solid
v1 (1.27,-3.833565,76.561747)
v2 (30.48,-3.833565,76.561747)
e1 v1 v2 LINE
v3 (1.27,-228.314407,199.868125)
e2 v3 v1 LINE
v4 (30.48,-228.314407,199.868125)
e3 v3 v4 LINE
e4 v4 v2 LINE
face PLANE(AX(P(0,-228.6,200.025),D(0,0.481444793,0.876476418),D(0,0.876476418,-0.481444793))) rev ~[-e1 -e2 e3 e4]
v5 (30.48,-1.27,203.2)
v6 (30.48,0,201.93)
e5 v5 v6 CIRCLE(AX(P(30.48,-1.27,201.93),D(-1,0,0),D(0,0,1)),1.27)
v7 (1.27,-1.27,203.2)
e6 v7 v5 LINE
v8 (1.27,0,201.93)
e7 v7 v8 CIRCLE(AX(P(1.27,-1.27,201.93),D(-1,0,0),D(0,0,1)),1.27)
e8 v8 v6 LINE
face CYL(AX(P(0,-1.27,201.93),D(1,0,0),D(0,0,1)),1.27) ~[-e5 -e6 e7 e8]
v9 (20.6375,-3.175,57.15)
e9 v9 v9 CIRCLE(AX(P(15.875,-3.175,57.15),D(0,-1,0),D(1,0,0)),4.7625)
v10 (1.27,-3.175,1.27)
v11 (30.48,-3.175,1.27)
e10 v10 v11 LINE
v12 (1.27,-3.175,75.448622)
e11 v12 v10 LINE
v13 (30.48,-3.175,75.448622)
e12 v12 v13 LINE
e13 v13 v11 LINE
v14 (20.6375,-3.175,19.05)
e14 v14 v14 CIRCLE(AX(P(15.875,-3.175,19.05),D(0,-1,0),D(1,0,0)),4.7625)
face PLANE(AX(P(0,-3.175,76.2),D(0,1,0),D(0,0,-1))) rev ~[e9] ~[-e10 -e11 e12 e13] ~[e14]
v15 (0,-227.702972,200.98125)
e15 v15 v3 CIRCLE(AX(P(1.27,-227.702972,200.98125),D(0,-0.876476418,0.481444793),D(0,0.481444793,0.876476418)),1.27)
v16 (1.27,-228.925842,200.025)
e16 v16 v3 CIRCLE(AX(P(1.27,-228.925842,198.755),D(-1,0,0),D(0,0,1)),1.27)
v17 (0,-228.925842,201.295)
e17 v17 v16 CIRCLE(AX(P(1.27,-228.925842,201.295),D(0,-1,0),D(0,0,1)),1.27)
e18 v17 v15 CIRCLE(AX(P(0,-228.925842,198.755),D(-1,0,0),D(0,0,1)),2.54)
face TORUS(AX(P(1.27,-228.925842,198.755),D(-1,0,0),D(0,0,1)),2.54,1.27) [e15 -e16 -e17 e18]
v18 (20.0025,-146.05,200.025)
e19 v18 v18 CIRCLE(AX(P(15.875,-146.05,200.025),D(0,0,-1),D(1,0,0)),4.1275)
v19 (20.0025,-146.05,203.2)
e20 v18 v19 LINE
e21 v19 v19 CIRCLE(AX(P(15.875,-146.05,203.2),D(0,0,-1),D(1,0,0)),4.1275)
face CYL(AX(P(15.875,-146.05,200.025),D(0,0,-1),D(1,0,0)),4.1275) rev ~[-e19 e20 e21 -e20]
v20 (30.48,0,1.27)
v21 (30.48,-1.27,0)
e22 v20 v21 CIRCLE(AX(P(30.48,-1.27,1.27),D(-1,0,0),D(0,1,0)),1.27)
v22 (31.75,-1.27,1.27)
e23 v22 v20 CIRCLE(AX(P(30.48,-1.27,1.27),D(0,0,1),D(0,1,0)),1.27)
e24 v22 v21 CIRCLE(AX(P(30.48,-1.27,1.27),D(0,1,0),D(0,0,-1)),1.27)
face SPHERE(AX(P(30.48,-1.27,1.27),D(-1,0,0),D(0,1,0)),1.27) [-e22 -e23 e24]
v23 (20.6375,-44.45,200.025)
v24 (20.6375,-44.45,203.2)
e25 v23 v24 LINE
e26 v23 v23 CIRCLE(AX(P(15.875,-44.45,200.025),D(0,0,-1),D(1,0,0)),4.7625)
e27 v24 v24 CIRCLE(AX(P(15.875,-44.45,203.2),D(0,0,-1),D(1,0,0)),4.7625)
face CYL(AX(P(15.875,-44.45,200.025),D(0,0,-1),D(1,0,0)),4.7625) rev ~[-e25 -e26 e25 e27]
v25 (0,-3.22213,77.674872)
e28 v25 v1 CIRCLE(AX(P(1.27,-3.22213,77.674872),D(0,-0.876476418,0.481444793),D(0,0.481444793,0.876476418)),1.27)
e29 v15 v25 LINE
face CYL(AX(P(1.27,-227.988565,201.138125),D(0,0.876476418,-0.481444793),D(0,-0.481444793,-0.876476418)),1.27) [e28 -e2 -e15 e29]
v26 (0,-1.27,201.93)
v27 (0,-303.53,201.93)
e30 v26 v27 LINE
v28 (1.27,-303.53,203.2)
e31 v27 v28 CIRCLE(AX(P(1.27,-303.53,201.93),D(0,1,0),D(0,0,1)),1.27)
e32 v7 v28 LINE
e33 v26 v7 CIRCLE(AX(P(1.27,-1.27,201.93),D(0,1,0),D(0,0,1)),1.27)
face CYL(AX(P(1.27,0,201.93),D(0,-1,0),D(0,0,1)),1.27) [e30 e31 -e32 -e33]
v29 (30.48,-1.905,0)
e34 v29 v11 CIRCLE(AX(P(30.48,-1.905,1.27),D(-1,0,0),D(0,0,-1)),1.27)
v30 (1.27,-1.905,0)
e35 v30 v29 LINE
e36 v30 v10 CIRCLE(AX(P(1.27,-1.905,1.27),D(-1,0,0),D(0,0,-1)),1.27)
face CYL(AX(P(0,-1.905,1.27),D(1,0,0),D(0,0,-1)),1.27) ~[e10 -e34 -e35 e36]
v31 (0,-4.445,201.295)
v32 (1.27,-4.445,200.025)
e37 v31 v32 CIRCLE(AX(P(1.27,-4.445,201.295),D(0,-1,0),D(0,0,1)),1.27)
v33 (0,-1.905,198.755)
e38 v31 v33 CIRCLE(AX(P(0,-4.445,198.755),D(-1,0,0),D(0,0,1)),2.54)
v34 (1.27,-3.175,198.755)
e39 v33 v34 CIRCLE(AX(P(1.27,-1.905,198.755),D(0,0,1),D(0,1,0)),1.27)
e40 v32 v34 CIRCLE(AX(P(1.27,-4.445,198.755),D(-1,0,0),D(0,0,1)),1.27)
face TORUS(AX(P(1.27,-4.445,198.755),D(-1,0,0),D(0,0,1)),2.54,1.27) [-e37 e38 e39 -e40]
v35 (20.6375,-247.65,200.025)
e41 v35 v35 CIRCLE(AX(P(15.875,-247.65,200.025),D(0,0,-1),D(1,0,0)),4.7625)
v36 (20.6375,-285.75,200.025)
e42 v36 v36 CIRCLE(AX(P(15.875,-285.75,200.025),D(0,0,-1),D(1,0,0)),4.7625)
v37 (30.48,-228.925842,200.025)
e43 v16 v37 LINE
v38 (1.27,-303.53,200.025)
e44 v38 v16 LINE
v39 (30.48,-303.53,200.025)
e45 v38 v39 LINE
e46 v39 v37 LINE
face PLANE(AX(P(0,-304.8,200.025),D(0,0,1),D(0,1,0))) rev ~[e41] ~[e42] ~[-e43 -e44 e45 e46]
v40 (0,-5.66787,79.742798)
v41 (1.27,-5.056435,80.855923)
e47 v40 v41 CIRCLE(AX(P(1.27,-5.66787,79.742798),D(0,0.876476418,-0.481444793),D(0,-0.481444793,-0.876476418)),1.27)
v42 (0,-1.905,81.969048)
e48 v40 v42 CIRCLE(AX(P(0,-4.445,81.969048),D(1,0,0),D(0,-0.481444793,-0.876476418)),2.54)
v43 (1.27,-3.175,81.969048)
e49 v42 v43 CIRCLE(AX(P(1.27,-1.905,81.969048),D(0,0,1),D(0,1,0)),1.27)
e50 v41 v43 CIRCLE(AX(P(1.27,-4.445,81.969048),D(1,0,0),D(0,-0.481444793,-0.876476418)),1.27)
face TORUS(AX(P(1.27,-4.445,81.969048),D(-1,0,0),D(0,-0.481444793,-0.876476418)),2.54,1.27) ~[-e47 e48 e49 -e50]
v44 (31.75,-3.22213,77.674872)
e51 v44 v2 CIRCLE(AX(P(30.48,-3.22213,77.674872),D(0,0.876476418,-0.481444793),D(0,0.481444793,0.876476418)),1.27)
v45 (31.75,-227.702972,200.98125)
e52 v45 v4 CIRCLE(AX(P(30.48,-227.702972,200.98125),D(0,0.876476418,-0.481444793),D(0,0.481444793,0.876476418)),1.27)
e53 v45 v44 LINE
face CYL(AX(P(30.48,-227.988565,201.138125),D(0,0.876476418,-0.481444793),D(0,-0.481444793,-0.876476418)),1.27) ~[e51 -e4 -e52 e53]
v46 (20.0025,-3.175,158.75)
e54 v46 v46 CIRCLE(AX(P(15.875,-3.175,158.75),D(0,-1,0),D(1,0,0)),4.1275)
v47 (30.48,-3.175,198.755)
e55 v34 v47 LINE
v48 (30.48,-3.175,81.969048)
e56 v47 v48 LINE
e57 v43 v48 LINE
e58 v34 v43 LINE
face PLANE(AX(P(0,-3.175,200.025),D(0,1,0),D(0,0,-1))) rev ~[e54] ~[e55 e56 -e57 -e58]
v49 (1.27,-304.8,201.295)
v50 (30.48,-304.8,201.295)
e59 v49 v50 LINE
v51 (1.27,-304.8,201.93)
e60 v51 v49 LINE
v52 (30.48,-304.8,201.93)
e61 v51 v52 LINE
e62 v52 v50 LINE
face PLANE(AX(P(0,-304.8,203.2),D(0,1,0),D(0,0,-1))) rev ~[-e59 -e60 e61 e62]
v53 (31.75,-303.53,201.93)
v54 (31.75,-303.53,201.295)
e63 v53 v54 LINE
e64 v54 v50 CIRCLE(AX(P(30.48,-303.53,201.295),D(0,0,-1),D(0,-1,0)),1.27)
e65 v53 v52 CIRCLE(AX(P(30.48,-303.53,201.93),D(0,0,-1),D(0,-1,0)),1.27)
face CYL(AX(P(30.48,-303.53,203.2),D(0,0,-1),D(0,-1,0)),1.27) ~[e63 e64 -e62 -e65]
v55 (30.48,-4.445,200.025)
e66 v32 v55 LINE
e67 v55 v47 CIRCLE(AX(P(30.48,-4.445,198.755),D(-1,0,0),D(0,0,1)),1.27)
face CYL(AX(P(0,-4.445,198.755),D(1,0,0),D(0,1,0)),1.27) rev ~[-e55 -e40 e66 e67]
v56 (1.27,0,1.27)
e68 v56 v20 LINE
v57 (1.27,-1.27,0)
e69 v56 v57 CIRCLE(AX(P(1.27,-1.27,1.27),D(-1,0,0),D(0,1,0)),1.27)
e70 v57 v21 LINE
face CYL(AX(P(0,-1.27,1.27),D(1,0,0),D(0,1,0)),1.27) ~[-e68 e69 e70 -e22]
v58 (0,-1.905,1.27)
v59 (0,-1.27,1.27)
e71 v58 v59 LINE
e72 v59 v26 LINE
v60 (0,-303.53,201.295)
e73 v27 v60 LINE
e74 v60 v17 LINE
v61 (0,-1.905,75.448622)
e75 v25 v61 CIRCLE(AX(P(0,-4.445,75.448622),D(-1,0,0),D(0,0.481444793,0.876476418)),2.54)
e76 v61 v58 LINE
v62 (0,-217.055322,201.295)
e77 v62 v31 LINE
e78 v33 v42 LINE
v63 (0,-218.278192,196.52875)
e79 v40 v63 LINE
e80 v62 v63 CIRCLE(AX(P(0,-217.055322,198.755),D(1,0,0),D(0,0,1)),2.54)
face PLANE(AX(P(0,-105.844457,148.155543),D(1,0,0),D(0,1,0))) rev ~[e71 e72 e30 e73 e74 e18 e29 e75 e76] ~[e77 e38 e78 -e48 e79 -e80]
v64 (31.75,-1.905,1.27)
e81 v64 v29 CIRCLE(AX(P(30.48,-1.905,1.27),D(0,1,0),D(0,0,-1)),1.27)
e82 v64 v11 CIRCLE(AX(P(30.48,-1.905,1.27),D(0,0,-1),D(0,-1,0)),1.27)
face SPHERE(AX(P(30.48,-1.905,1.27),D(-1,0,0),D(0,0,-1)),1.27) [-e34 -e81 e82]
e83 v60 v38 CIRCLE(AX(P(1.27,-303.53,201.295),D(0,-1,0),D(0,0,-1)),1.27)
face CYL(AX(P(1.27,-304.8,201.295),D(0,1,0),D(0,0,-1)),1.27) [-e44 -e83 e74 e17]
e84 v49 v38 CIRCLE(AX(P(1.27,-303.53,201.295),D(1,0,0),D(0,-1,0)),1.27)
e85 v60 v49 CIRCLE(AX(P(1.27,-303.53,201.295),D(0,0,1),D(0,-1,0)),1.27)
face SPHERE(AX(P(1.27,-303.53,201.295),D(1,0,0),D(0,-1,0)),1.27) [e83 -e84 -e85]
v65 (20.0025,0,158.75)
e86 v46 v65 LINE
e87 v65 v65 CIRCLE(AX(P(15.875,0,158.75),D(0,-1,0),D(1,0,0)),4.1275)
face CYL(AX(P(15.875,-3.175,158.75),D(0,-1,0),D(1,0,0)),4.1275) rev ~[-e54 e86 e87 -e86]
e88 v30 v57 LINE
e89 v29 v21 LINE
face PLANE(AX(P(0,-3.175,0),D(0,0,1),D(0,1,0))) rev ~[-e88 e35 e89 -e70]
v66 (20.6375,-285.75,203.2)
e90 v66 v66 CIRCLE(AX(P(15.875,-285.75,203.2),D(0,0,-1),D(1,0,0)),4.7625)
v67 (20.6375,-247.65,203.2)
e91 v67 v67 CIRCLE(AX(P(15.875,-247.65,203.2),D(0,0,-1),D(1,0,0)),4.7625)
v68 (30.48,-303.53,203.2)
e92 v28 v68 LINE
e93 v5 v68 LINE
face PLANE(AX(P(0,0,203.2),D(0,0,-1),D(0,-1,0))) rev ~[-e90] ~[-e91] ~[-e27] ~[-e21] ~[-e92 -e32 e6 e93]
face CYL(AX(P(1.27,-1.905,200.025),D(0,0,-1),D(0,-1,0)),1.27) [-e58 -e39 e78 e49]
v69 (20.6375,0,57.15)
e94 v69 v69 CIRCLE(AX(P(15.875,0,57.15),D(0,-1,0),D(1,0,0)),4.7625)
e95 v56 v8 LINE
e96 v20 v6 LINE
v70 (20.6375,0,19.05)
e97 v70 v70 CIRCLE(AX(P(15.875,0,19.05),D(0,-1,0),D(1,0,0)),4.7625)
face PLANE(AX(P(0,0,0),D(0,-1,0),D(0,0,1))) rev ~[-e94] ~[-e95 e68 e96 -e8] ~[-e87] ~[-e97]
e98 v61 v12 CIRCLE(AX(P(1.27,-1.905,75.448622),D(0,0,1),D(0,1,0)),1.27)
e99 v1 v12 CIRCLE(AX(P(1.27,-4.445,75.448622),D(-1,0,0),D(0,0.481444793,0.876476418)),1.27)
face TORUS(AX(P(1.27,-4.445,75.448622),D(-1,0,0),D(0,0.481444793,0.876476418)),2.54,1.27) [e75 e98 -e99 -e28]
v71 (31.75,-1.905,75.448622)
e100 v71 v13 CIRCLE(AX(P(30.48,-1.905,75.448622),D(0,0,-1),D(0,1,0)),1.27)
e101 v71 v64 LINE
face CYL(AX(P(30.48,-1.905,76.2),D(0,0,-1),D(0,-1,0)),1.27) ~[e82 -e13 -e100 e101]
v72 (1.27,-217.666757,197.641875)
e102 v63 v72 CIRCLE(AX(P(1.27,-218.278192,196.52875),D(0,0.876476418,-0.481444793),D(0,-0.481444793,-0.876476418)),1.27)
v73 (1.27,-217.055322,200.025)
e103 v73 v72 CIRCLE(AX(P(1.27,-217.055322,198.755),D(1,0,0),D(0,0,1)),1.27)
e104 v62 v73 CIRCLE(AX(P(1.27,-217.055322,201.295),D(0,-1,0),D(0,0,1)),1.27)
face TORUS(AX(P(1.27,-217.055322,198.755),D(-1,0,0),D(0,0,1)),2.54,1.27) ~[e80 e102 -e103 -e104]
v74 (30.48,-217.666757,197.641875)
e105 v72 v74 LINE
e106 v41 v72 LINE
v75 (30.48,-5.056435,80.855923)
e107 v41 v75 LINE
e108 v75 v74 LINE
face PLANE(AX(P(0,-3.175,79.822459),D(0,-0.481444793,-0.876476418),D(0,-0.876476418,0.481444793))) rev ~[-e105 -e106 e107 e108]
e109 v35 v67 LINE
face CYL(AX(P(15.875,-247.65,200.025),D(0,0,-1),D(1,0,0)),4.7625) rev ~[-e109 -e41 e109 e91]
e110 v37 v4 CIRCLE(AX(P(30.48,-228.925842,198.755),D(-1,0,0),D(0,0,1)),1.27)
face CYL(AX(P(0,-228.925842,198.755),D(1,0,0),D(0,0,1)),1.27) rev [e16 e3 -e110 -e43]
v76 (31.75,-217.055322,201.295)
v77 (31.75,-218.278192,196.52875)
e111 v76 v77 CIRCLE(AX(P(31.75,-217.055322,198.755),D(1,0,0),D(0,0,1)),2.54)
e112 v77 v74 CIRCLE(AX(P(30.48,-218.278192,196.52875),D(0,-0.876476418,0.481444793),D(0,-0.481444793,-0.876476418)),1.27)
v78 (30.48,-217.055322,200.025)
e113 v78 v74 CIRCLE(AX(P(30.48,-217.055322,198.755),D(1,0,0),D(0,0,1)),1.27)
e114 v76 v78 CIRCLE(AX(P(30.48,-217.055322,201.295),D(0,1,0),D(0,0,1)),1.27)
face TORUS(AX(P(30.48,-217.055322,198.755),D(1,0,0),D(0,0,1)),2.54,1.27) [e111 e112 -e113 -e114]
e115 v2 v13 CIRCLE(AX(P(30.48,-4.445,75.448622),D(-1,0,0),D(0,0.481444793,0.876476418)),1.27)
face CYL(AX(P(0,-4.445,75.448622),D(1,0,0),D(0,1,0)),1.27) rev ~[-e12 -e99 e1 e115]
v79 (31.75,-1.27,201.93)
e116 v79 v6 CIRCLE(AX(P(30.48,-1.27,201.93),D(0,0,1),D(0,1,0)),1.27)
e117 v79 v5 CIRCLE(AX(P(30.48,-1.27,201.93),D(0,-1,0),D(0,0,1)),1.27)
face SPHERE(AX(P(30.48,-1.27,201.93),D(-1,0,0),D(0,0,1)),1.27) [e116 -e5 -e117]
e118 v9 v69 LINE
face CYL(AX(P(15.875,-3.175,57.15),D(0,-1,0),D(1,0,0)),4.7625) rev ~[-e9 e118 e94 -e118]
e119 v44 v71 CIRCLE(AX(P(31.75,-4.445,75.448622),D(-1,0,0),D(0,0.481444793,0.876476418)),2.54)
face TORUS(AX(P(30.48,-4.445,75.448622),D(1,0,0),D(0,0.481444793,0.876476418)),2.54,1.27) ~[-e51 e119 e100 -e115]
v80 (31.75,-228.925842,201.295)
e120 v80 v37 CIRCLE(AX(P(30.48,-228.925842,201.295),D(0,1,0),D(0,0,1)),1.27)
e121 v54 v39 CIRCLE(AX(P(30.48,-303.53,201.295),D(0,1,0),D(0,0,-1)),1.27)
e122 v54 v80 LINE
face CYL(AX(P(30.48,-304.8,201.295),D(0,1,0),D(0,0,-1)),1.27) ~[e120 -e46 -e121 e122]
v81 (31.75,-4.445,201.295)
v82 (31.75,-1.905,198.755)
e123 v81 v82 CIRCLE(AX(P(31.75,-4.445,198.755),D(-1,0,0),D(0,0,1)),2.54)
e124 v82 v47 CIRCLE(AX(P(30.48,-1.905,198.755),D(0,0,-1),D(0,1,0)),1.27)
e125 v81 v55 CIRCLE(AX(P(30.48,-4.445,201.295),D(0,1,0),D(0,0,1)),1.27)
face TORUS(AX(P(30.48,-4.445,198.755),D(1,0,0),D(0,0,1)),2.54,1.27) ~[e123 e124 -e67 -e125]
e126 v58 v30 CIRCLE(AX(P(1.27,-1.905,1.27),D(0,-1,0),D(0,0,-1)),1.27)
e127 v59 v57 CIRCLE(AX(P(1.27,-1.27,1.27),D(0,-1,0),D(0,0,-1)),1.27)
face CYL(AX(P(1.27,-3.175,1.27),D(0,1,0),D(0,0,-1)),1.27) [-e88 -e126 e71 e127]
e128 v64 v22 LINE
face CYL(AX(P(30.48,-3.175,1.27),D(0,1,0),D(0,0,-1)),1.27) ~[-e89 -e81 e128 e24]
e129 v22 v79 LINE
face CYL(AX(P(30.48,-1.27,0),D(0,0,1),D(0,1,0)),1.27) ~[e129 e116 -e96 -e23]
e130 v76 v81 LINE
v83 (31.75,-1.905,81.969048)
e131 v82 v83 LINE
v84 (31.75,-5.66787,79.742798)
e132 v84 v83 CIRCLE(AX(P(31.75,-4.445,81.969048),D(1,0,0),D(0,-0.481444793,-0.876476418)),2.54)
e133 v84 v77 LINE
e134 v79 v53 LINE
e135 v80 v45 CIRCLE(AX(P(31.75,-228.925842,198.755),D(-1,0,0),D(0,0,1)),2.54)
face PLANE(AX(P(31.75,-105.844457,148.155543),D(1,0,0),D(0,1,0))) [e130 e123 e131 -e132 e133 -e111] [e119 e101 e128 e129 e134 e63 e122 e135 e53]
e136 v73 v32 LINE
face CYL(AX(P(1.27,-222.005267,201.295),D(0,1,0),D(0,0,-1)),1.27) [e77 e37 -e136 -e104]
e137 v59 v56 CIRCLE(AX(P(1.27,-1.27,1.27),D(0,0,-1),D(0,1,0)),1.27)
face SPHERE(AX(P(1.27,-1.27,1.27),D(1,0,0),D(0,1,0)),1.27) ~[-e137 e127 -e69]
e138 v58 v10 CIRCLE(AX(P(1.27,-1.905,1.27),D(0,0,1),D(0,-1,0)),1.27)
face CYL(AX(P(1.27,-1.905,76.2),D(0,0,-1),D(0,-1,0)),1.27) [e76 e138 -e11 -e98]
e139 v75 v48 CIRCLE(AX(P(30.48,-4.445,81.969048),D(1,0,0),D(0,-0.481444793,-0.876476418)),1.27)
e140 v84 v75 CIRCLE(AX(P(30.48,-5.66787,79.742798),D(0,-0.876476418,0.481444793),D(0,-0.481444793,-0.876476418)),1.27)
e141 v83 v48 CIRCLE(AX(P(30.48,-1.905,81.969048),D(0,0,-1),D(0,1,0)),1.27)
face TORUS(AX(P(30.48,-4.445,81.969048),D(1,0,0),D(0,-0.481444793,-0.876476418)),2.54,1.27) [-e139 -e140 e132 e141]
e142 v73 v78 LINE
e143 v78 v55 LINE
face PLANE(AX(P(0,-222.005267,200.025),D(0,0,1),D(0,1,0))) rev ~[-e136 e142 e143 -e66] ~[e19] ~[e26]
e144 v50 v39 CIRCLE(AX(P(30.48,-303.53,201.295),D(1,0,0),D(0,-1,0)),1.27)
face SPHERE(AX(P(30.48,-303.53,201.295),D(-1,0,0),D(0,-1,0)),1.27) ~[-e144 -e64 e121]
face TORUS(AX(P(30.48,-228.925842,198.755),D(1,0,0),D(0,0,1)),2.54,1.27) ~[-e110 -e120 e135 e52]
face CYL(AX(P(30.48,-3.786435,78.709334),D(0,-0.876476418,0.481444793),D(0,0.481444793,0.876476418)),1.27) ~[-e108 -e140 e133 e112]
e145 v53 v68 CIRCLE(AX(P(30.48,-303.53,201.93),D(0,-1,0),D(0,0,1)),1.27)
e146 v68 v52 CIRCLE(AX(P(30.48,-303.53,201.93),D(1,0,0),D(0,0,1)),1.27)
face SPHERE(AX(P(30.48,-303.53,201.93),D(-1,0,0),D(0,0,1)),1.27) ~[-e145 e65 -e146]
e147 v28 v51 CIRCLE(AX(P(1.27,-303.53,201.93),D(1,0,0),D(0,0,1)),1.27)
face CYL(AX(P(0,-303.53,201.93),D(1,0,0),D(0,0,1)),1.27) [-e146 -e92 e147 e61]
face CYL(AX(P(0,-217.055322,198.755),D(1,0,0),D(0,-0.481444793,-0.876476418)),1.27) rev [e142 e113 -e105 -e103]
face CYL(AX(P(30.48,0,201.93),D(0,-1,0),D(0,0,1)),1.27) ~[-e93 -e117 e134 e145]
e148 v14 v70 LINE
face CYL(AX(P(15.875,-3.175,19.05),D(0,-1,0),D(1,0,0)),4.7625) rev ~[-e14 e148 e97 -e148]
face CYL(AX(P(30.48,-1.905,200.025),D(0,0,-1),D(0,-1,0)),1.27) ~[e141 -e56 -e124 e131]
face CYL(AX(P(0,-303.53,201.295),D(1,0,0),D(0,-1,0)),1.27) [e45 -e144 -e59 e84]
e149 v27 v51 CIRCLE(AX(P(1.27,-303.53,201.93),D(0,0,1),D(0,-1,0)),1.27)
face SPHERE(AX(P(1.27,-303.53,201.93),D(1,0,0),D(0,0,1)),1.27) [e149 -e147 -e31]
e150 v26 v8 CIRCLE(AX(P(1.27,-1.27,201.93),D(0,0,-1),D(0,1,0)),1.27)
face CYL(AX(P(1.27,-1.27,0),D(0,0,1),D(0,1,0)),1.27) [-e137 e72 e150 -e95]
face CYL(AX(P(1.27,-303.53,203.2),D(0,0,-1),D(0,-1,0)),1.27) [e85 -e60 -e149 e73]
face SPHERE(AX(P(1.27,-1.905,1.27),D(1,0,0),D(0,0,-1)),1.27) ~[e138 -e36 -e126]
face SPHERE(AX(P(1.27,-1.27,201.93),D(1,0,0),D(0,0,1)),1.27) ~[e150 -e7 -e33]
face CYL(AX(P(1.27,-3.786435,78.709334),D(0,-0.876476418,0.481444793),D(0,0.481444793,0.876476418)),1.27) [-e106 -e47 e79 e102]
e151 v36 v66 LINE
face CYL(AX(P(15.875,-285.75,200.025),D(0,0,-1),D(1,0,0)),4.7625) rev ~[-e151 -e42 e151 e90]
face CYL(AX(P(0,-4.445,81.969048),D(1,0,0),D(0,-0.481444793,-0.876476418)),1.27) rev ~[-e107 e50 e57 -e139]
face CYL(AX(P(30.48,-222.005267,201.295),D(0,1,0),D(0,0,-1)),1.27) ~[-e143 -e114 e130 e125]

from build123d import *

# Parameters (mm, degrees)
F1_DEPTH = 31.75
F3_R     = 1.27
F4_R     = 4.7625
F4_R_2   = 4.1275
F5_DEPTH = 3.175
F6_R     = 4.7625
F6_R_2   = 4.1275
F7_DEPTH = 3.175


# Not quite as in the source:
# - a feature of the source that left no trace in its solid (it failed there, or was rolled back) is left out


with BuildPart() as f1:
    # F0 (on Right) → F1 (new body)
    with BuildSketch(Plane.YZ):
        Polygon((0, 203.2), (-304.8, 203.2), (-304.8, 200.025), (-228.6, 200.025), (-3.175, 76.2), (-3.175, 0), (0, 0), align=None)
        Polygon((-222.0052667175, 200.025), (-3.175, 200.025), (-3.175, 79.822459127), align=None, mode=Mode.SUBTRACT)
    extrude(amount=F1_DEPTH)

    # F3
    f3_edges = [f1.edges().sort_by_distance(p)[0] for p in [
        (15.875, -3.175, 79.822459),
        (15.875, -222.005267, 200.025),
        (15.875, -3.175, 200.025),
        (15.875, 0, 203.2),
        (15.875, -304.8, 203.2),
        (0, -152.4, 203.2),
        (31.75, -152.4, 203.2),
        (15.875, -304.8, 200.025),
        (0, -304.8, 201.6125),
        (31.75, -304.8, 201.6125),
        (0, -112.590133, 200.025),
        (31.75, -112.590133, 200.025),
        (15.875, 0, 0),
        (0, 0, 101.6),
        (31.75, 0, 101.6),
        (15.875, -3.175, 0),
        (0, -1.5875, 0),
        (31.75, -1.5875, 0),
        (15.875, -228.6, 200.025),
        (0, -266.7, 200.025),
        (31.75, -266.7, 200.025),
        (15.875, -3.175, 76.2),
        (0, -115.8875, 138.1125),
        (31.75, -115.8875, 138.1125),
        (0, -3.175, 38.1),
        (31.75, -3.175, 38.1),
        (0, -112.590133, 139.92373),
        (31.75, -112.590133, 139.92373),
        (0, -3.175, 139.92373),
        (31.75, -3.175, 139.92373),
    ]]
    fillet(f3_edges, radius=F3_R)

    # F4 (on face) → F5 (cut, through all)
    with BuildSketch(Plane(origin=(0, 0, 200.025), x_dir=(1, 0, 0), z_dir=(0, 0, -1))):
        with Locations((15.875, 285.75)):
            Circle(F4_R)
        with Locations((15.875, 247.65)):
            Circle(F4_R)
        with Locations((15.875, 146.05)):
            Circle(F4_R_2)
        with Locations((15.875, 44.45)):
            Circle(F4_R)
    extrude(amount=-F5_DEPTH, mode=Mode.SUBTRACT)

    # F6 (on face) → F7 (cut, through all)
    with BuildSketch(Plane.XZ.offset(3.175)):
        with Locations((15.875, 57.15)):
            Circle(F6_R)
        with Locations((15.875, 19.05)):
            Circle(F6_R)
        with Locations((15.875, 158.75)):
            Circle(F6_R_2)
    extrude(amount=-F7_DEPTH, mode=Mode.SUBTRACT)


solid = f1.part
